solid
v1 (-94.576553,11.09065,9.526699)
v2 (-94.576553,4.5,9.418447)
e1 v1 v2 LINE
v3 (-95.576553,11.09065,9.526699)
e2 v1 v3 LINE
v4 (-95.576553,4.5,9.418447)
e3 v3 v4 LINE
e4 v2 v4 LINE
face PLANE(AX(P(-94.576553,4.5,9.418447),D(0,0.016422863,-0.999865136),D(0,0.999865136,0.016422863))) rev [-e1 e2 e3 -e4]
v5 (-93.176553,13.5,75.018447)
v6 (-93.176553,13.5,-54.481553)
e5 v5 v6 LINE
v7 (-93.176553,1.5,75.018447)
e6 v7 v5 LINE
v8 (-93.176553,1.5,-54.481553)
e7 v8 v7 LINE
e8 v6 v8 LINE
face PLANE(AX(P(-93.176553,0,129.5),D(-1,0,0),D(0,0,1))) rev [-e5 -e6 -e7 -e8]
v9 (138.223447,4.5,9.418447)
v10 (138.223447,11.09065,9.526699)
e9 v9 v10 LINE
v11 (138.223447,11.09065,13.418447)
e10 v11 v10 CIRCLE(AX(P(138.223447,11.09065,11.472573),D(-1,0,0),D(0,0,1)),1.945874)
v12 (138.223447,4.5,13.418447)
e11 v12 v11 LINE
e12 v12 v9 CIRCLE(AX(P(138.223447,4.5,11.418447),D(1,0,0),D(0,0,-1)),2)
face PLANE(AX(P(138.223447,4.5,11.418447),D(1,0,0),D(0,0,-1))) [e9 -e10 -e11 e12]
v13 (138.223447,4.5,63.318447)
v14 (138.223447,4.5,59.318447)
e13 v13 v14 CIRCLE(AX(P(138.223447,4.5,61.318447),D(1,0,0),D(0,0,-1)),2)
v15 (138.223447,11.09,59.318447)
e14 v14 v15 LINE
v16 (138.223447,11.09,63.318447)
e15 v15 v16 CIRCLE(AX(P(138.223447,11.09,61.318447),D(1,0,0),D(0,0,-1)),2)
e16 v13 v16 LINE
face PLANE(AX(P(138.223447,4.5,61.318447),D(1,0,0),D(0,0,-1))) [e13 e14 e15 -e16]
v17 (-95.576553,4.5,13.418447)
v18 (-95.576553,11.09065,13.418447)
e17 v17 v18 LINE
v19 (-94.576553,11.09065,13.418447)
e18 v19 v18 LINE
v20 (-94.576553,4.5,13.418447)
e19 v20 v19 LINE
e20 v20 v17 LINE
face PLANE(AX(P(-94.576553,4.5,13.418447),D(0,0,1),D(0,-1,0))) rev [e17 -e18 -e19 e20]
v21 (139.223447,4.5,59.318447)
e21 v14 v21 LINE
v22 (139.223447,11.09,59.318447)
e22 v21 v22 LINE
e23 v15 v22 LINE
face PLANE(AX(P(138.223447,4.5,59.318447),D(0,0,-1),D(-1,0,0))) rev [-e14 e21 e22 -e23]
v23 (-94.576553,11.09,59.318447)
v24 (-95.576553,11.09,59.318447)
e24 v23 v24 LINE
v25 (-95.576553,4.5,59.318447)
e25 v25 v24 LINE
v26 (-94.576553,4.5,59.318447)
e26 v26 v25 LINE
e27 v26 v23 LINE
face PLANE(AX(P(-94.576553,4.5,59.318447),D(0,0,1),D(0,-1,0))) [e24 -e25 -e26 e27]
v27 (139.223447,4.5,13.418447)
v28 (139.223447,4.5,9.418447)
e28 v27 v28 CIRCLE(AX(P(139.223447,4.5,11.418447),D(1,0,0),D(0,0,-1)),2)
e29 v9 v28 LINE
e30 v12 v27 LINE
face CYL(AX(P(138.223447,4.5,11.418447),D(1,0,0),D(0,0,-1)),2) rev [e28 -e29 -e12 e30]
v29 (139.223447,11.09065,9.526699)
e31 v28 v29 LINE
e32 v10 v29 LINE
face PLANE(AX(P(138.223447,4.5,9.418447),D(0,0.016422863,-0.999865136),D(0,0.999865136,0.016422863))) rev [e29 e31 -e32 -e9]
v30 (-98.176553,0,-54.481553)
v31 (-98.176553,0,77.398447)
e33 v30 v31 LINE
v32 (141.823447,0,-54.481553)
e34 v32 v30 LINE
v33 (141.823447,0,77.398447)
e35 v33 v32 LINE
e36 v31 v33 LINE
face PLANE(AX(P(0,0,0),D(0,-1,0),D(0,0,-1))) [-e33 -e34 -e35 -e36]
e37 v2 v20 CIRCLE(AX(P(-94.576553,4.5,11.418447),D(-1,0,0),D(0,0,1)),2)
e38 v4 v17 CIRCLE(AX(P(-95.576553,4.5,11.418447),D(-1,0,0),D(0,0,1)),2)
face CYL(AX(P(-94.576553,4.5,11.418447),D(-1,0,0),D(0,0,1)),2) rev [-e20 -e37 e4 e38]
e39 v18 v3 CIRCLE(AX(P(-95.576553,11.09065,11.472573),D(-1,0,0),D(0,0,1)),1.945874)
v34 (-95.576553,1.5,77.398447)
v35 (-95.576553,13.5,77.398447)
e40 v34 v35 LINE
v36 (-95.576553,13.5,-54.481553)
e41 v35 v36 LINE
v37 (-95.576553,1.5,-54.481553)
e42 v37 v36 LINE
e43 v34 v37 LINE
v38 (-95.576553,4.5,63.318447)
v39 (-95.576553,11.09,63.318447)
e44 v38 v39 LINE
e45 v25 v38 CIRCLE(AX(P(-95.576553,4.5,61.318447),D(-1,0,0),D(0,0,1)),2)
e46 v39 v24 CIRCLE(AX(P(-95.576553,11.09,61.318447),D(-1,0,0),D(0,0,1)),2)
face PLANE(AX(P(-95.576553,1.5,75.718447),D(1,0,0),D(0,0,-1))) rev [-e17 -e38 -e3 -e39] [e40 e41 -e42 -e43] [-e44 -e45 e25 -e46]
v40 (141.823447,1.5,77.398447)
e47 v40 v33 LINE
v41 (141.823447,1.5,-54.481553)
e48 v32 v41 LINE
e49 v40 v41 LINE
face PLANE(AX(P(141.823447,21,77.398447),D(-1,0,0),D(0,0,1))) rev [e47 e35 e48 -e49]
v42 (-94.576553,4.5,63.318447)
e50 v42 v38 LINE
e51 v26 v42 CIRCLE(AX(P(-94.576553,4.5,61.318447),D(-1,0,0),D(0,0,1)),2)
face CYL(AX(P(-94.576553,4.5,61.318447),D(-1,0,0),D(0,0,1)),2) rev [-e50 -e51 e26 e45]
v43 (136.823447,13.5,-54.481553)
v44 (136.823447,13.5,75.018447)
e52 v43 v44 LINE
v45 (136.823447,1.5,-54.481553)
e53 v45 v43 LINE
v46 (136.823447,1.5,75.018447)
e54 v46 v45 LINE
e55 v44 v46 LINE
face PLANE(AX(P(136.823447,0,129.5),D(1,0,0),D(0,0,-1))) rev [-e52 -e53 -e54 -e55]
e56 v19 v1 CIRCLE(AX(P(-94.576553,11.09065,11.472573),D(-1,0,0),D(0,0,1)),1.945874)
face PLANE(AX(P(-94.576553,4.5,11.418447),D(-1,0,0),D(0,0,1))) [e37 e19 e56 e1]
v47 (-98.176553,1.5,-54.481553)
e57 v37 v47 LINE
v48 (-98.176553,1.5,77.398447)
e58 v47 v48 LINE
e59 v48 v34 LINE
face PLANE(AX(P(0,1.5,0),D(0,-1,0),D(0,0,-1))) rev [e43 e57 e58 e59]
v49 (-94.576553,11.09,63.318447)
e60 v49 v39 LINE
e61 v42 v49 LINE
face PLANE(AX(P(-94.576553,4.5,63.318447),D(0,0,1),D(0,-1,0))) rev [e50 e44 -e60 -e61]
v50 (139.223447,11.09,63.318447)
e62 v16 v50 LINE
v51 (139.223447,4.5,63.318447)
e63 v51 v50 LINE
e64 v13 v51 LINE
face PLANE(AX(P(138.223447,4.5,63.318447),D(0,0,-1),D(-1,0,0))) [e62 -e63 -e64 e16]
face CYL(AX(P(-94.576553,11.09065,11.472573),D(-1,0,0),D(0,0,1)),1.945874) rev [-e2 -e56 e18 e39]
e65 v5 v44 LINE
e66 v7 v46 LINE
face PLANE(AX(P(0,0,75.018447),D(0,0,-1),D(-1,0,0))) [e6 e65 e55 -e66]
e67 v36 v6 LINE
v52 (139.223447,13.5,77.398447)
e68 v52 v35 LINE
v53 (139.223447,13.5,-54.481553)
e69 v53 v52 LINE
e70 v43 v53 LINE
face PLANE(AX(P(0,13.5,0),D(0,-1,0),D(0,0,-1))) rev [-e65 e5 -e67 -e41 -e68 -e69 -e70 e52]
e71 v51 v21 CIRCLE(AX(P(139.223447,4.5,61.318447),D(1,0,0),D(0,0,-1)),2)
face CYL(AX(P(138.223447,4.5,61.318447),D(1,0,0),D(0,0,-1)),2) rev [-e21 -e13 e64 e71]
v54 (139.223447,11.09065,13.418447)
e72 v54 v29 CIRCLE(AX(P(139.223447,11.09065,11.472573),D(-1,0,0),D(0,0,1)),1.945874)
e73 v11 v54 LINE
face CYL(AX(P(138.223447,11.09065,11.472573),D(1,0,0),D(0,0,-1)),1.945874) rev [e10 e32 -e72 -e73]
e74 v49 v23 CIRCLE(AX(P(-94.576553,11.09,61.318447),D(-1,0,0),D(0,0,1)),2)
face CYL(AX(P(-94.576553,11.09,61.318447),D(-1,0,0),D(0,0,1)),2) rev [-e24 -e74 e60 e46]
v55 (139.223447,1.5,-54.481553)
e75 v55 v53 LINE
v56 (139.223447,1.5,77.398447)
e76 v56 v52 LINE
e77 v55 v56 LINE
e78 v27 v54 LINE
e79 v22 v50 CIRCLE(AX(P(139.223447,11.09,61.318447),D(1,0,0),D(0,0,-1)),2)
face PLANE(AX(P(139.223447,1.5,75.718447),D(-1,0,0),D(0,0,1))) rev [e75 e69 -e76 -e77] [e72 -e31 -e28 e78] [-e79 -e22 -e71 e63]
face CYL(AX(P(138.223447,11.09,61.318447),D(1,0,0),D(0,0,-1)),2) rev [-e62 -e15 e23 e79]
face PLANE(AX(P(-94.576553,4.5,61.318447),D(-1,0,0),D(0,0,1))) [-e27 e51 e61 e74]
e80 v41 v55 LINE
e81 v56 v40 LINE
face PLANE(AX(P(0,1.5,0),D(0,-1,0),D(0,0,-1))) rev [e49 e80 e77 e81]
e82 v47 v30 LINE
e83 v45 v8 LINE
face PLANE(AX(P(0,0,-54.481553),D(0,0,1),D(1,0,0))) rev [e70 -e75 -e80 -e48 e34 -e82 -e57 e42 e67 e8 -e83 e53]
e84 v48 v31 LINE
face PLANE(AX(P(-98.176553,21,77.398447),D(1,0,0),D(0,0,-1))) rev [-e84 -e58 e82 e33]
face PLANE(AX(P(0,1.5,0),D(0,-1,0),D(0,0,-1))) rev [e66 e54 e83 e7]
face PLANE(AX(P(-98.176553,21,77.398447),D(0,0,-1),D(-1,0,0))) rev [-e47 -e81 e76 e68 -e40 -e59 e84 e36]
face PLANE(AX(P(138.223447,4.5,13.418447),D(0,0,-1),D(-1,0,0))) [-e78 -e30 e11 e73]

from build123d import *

# Parameters (mm, degrees)
SKETCH1_W           = 240
SKETCH1_H           = 351.15
BOSS_EXTRUDE3_DEPTH = 21
SKETCH5_W           = 248.975913499
SKETCH5_H           = 113.170869772
CUT_EXTRUDE5_DEPTH  = 254
CAVITY1_START       = -93.176553254
CAVITY1_DEPTH       = 230
SKETCH6_W           = 230
SKETCH6_H           = 2.384694545
CUT_EXTRUDE6_DEPTH  = 10
SKETCH7_W           = 329.692379319
SKETCH7_H           = 158.801284786
CUT_EXTRUDE8_DEPTH  = 33
CUT_EXTRUDE9_DEPTH  = 12
SKETCH15_W          = 230
SKETCH15_H          = 129.5
CUT_EXTRUDE15_DEPTH = 3.5
CUT_EXTRUDE17_DEPTH = 1
CUT_EXTRUDE18_START = -1
CUT_EXTRUDE18_DEPTH = 1
CUT_EXTRUDE19_DEPTH = 1
CUT_EXTRUDE20_START = -1
CUT_EXTRUDE20_DEPTH = 1


with BuildPart() as part:
    # Sketch1 → Boss-Extrude3 (new body)
    with BuildSketch(Plane(origin=(0, 0, 0), x_dir=(1, 0, 0), z_dir=(0, 1, 0))):
        with Locations((21.823446746, 98.176553254)):
            Rectangle(SKETCH1_W, SKETCH1_H)
    extrude(amount=BOSS_EXTRUDE3_DEPTH)

    # Sketch5 → Cut-Extrude5 (cut)
    with BuildSketch(Plane(origin=(0, 0, -54.481553254), x_dir=(-1, 0, 0), z_dir=(0, 0, -1))):
        with Locations((-20.8478358, 4.110963623)):
            Rectangle(SKETCH5_W, SKETCH5_H)
    extrude(amount=CUT_EXTRUDE5_DEPTH, mode=Mode.SUBTRACT)

    # Cavity1: read off the stored shape, not the designer's step
    # Cavity1 outline → Cavity1 (cut)
    with BuildSketch(Plane.YZ.offset(CAVITY1_START)):
        Polygon((18.5, 60.403141291), (13.5, 67.518446746), (13.5, 67.903141291), (18.5, 67.903141291), (13.5, 75.018446746), (5, 75.018446746), (5, -54.481553254), (13.5, -54.481553254), (13.5, -52.096858709), (18.5, -52.096858709), (13.5, -44.981553254), (13.5, -44.596858709), (18.5, -44.596858709), (13.5, -37.481553254), (13.5, -37.096858709), (18.5, -37.096858709), (13.5, -29.981553254), (13.5, -29.596858709), (18.5, -29.596858709), (13.5, -22.481553254), (13.5, -22.096858709), (18.5, -22.096858709), (13.5, -14.981553254), (13.5, -14.596858709), (18.5, -14.596858709), (13.5, -7.481553254), (13.5, -7.096858709), (18.5, -7.096858709), (13.5, 0.018446746), (13.5, 0.403141291), (18.5, 0.403141291), (13.5, 7.518446746), (13.5, 7.903141291), (18.5, 7.903141291), (13.5, 15.018446746), (13.5, 15.403141291), (18.5, 15.403141291), (13.5, 22.518446746), (13.5, 22.903141291), (18.5, 22.903141291), (13.5, 30.018446746), (13.5, 30.403141291), (18.5, 30.403141291), (13.5, 37.518446746), (13.5, 37.903141291), (18.5, 37.903141291), (13.5, 45.018446746), (13.5, 45.403141291), (18.5, 45.403141291), (13.5, 52.518446746), (13.5, 52.903141291), (18.5, 52.903141291), (13.5, 60.018446746), (13.5, 60.403141291), align=None)
    extrude(amount=CAVITY1_DEPTH, mode=Mode.SUBTRACT)

    # Sketch6 → Cut-Extrude6 (cut)
    with BuildSketch(Plane(origin=(0, 13.5, 0), x_dir=(-1, 0, 0), z_dir=(0, -1, 0))):
        with Locations((-21.823446746, 53.289205982)):
            Rectangle(SKETCH6_W, SKETCH6_H)
    extrude(amount=-CUT_EXTRUDE6_DEPTH, mode=Mode.SUBTRACT)

    # Sketch7 → Cut-Extrude8 (cut)
    with BuildSketch(Plane(origin=(0, 13.5, 0), x_dir=(-1, 0, 0), z_dir=(0, -1, 0))):
        with Locations((-33.84938791, -12.885366014)):
            Rectangle(SKETCH7_W, SKETCH7_H)
    extrude(amount=-CUT_EXTRUDE8_DEPTH, mode=Mode.SUBTRACT)

    # Sketch9 → Cut-Extrude9 (cut)
    with BuildSketch(Plane(origin=(0, 13.5, 0), x_dir=(1, 0, 0), z_dir=(0, 1, 0))):
        Polygon((139.223446746, 54.481553254), (139.223446746, -75.718446746), (139.223446746, -77.398446746), (141.823446746, -77.398446746), (141.823446746, 54.481553254), align=None)
        Polygon((-95.576553254, -75.718446746), (-95.576553254, -77.398446746), (-98.176553254, -77.398446746), (-98.176553254, 54.481553254), (-95.576553254, 54.481553254), align=None)
    extrude(amount=-CUT_EXTRUDE9_DEPTH, mode=Mode.SUBTRACT)

    # Sketch15 → Cut-Extrude15 (cut)
    with BuildSketch(Plane(origin=(0, 5, 0), x_dir=(1, 0, 0), z_dir=(0, 1, 0))):
        with Locations((21.823446746, -10.268446746)):
            Rectangle(SKETCH15_W, SKETCH15_H)
    extrude(amount=-CUT_EXTRUDE15_DEPTH, mode=Mode.SUBTRACT)

    # Sketch17 → Cut-Extrude17 (cut)
    with BuildSketch(Plane.ZY.offset(95.576553254)):
        with BuildLine():
            Line((9.418446746, 4.5), (9.526698687, 11.090649814))
            ThreePointArc((9.526698687, 11.090649814), (11.472572716, 13.036523843), (13.418446746, 11.090649814))
            Line((13.418446746, 11.090649814), (13.418446746, 4.5))
            ThreePointArc((13.418446746, 4.5), (11.418446746, 2.5), (9.418446746, 4.5))
        make_face()
    extrude(amount=-CUT_EXTRUDE17_DEPTH, mode=Mode.SUBTRACT)

    # Sketch16 → Cut-Extrude18 (cut)
    with BuildSketch(Plane(origin=(139.223446746, 0, 0), x_dir=(0, 0, -1), z_dir=(1, 0, 0)).offset(CUT_EXTRUDE18_START)):
        with BuildLine():
            Line((-13.418446746, 4.5), (-13.418446746, 11.090649814))
            ThreePointArc((-13.418446746, 11.090649814), (-11.472572716, 13.036523843), (-9.526698687, 11.090649814))
            Line((-9.526698687, 11.090649814), (-9.418446746, 4.5))
            ThreePointArc((-9.418446746, 4.5), (-11.418446746, 2.5), (-13.418446746, 4.5))
        make_face()
    extrude(amount=CUT_EXTRUDE18_DEPTH, mode=Mode.SUBTRACT)

    # Sketch20 → Cut-Extrude19 (cut)
    with BuildSketch(Plane(origin=(139.223446746, 0, 0), x_dir=(0, 0, -1), z_dir=(1, 0, 0))):
        with BuildLine():
            Line((-59.318446746, 4.5), (-59.318446746, 11.09))
            ThreePointArc((-59.318446746, 11.09), (-61.318446746, 13.09), (-63.318446746, 11.09))
            Line((-63.318446746, 11.09), (-63.318446746, 4.5))
            ThreePointArc((-63.318446746, 4.5), (-61.318446746, 2.5), (-59.318446746, 4.5))
        make_face()
    extrude(amount=-CUT_EXTRUDE19_DEPTH, mode=Mode.SUBTRACT)

    # Sketch18 → Cut-Extrude20 (cut)
    with BuildSketch(Plane.ZY.offset(95.576553254).offset(CUT_EXTRUDE20_START)):
        with BuildLine():
            Line((63.318446746, 4.5), (63.318446746, 11.09))
            ThreePointArc((63.318446746, 11.09), (61.318446746, 13.09), (59.318446746, 11.09))
            Line((59.318446746, 11.09), (59.318446746, 4.5))
            ThreePointArc((59.318446746, 4.5), (61.318446746, 2.5), (63.318446746, 4.5))
        make_face()
    extrude(amount=CUT_EXTRUDE20_DEPTH, mode=Mode.SUBTRACT)


solid = part.part
